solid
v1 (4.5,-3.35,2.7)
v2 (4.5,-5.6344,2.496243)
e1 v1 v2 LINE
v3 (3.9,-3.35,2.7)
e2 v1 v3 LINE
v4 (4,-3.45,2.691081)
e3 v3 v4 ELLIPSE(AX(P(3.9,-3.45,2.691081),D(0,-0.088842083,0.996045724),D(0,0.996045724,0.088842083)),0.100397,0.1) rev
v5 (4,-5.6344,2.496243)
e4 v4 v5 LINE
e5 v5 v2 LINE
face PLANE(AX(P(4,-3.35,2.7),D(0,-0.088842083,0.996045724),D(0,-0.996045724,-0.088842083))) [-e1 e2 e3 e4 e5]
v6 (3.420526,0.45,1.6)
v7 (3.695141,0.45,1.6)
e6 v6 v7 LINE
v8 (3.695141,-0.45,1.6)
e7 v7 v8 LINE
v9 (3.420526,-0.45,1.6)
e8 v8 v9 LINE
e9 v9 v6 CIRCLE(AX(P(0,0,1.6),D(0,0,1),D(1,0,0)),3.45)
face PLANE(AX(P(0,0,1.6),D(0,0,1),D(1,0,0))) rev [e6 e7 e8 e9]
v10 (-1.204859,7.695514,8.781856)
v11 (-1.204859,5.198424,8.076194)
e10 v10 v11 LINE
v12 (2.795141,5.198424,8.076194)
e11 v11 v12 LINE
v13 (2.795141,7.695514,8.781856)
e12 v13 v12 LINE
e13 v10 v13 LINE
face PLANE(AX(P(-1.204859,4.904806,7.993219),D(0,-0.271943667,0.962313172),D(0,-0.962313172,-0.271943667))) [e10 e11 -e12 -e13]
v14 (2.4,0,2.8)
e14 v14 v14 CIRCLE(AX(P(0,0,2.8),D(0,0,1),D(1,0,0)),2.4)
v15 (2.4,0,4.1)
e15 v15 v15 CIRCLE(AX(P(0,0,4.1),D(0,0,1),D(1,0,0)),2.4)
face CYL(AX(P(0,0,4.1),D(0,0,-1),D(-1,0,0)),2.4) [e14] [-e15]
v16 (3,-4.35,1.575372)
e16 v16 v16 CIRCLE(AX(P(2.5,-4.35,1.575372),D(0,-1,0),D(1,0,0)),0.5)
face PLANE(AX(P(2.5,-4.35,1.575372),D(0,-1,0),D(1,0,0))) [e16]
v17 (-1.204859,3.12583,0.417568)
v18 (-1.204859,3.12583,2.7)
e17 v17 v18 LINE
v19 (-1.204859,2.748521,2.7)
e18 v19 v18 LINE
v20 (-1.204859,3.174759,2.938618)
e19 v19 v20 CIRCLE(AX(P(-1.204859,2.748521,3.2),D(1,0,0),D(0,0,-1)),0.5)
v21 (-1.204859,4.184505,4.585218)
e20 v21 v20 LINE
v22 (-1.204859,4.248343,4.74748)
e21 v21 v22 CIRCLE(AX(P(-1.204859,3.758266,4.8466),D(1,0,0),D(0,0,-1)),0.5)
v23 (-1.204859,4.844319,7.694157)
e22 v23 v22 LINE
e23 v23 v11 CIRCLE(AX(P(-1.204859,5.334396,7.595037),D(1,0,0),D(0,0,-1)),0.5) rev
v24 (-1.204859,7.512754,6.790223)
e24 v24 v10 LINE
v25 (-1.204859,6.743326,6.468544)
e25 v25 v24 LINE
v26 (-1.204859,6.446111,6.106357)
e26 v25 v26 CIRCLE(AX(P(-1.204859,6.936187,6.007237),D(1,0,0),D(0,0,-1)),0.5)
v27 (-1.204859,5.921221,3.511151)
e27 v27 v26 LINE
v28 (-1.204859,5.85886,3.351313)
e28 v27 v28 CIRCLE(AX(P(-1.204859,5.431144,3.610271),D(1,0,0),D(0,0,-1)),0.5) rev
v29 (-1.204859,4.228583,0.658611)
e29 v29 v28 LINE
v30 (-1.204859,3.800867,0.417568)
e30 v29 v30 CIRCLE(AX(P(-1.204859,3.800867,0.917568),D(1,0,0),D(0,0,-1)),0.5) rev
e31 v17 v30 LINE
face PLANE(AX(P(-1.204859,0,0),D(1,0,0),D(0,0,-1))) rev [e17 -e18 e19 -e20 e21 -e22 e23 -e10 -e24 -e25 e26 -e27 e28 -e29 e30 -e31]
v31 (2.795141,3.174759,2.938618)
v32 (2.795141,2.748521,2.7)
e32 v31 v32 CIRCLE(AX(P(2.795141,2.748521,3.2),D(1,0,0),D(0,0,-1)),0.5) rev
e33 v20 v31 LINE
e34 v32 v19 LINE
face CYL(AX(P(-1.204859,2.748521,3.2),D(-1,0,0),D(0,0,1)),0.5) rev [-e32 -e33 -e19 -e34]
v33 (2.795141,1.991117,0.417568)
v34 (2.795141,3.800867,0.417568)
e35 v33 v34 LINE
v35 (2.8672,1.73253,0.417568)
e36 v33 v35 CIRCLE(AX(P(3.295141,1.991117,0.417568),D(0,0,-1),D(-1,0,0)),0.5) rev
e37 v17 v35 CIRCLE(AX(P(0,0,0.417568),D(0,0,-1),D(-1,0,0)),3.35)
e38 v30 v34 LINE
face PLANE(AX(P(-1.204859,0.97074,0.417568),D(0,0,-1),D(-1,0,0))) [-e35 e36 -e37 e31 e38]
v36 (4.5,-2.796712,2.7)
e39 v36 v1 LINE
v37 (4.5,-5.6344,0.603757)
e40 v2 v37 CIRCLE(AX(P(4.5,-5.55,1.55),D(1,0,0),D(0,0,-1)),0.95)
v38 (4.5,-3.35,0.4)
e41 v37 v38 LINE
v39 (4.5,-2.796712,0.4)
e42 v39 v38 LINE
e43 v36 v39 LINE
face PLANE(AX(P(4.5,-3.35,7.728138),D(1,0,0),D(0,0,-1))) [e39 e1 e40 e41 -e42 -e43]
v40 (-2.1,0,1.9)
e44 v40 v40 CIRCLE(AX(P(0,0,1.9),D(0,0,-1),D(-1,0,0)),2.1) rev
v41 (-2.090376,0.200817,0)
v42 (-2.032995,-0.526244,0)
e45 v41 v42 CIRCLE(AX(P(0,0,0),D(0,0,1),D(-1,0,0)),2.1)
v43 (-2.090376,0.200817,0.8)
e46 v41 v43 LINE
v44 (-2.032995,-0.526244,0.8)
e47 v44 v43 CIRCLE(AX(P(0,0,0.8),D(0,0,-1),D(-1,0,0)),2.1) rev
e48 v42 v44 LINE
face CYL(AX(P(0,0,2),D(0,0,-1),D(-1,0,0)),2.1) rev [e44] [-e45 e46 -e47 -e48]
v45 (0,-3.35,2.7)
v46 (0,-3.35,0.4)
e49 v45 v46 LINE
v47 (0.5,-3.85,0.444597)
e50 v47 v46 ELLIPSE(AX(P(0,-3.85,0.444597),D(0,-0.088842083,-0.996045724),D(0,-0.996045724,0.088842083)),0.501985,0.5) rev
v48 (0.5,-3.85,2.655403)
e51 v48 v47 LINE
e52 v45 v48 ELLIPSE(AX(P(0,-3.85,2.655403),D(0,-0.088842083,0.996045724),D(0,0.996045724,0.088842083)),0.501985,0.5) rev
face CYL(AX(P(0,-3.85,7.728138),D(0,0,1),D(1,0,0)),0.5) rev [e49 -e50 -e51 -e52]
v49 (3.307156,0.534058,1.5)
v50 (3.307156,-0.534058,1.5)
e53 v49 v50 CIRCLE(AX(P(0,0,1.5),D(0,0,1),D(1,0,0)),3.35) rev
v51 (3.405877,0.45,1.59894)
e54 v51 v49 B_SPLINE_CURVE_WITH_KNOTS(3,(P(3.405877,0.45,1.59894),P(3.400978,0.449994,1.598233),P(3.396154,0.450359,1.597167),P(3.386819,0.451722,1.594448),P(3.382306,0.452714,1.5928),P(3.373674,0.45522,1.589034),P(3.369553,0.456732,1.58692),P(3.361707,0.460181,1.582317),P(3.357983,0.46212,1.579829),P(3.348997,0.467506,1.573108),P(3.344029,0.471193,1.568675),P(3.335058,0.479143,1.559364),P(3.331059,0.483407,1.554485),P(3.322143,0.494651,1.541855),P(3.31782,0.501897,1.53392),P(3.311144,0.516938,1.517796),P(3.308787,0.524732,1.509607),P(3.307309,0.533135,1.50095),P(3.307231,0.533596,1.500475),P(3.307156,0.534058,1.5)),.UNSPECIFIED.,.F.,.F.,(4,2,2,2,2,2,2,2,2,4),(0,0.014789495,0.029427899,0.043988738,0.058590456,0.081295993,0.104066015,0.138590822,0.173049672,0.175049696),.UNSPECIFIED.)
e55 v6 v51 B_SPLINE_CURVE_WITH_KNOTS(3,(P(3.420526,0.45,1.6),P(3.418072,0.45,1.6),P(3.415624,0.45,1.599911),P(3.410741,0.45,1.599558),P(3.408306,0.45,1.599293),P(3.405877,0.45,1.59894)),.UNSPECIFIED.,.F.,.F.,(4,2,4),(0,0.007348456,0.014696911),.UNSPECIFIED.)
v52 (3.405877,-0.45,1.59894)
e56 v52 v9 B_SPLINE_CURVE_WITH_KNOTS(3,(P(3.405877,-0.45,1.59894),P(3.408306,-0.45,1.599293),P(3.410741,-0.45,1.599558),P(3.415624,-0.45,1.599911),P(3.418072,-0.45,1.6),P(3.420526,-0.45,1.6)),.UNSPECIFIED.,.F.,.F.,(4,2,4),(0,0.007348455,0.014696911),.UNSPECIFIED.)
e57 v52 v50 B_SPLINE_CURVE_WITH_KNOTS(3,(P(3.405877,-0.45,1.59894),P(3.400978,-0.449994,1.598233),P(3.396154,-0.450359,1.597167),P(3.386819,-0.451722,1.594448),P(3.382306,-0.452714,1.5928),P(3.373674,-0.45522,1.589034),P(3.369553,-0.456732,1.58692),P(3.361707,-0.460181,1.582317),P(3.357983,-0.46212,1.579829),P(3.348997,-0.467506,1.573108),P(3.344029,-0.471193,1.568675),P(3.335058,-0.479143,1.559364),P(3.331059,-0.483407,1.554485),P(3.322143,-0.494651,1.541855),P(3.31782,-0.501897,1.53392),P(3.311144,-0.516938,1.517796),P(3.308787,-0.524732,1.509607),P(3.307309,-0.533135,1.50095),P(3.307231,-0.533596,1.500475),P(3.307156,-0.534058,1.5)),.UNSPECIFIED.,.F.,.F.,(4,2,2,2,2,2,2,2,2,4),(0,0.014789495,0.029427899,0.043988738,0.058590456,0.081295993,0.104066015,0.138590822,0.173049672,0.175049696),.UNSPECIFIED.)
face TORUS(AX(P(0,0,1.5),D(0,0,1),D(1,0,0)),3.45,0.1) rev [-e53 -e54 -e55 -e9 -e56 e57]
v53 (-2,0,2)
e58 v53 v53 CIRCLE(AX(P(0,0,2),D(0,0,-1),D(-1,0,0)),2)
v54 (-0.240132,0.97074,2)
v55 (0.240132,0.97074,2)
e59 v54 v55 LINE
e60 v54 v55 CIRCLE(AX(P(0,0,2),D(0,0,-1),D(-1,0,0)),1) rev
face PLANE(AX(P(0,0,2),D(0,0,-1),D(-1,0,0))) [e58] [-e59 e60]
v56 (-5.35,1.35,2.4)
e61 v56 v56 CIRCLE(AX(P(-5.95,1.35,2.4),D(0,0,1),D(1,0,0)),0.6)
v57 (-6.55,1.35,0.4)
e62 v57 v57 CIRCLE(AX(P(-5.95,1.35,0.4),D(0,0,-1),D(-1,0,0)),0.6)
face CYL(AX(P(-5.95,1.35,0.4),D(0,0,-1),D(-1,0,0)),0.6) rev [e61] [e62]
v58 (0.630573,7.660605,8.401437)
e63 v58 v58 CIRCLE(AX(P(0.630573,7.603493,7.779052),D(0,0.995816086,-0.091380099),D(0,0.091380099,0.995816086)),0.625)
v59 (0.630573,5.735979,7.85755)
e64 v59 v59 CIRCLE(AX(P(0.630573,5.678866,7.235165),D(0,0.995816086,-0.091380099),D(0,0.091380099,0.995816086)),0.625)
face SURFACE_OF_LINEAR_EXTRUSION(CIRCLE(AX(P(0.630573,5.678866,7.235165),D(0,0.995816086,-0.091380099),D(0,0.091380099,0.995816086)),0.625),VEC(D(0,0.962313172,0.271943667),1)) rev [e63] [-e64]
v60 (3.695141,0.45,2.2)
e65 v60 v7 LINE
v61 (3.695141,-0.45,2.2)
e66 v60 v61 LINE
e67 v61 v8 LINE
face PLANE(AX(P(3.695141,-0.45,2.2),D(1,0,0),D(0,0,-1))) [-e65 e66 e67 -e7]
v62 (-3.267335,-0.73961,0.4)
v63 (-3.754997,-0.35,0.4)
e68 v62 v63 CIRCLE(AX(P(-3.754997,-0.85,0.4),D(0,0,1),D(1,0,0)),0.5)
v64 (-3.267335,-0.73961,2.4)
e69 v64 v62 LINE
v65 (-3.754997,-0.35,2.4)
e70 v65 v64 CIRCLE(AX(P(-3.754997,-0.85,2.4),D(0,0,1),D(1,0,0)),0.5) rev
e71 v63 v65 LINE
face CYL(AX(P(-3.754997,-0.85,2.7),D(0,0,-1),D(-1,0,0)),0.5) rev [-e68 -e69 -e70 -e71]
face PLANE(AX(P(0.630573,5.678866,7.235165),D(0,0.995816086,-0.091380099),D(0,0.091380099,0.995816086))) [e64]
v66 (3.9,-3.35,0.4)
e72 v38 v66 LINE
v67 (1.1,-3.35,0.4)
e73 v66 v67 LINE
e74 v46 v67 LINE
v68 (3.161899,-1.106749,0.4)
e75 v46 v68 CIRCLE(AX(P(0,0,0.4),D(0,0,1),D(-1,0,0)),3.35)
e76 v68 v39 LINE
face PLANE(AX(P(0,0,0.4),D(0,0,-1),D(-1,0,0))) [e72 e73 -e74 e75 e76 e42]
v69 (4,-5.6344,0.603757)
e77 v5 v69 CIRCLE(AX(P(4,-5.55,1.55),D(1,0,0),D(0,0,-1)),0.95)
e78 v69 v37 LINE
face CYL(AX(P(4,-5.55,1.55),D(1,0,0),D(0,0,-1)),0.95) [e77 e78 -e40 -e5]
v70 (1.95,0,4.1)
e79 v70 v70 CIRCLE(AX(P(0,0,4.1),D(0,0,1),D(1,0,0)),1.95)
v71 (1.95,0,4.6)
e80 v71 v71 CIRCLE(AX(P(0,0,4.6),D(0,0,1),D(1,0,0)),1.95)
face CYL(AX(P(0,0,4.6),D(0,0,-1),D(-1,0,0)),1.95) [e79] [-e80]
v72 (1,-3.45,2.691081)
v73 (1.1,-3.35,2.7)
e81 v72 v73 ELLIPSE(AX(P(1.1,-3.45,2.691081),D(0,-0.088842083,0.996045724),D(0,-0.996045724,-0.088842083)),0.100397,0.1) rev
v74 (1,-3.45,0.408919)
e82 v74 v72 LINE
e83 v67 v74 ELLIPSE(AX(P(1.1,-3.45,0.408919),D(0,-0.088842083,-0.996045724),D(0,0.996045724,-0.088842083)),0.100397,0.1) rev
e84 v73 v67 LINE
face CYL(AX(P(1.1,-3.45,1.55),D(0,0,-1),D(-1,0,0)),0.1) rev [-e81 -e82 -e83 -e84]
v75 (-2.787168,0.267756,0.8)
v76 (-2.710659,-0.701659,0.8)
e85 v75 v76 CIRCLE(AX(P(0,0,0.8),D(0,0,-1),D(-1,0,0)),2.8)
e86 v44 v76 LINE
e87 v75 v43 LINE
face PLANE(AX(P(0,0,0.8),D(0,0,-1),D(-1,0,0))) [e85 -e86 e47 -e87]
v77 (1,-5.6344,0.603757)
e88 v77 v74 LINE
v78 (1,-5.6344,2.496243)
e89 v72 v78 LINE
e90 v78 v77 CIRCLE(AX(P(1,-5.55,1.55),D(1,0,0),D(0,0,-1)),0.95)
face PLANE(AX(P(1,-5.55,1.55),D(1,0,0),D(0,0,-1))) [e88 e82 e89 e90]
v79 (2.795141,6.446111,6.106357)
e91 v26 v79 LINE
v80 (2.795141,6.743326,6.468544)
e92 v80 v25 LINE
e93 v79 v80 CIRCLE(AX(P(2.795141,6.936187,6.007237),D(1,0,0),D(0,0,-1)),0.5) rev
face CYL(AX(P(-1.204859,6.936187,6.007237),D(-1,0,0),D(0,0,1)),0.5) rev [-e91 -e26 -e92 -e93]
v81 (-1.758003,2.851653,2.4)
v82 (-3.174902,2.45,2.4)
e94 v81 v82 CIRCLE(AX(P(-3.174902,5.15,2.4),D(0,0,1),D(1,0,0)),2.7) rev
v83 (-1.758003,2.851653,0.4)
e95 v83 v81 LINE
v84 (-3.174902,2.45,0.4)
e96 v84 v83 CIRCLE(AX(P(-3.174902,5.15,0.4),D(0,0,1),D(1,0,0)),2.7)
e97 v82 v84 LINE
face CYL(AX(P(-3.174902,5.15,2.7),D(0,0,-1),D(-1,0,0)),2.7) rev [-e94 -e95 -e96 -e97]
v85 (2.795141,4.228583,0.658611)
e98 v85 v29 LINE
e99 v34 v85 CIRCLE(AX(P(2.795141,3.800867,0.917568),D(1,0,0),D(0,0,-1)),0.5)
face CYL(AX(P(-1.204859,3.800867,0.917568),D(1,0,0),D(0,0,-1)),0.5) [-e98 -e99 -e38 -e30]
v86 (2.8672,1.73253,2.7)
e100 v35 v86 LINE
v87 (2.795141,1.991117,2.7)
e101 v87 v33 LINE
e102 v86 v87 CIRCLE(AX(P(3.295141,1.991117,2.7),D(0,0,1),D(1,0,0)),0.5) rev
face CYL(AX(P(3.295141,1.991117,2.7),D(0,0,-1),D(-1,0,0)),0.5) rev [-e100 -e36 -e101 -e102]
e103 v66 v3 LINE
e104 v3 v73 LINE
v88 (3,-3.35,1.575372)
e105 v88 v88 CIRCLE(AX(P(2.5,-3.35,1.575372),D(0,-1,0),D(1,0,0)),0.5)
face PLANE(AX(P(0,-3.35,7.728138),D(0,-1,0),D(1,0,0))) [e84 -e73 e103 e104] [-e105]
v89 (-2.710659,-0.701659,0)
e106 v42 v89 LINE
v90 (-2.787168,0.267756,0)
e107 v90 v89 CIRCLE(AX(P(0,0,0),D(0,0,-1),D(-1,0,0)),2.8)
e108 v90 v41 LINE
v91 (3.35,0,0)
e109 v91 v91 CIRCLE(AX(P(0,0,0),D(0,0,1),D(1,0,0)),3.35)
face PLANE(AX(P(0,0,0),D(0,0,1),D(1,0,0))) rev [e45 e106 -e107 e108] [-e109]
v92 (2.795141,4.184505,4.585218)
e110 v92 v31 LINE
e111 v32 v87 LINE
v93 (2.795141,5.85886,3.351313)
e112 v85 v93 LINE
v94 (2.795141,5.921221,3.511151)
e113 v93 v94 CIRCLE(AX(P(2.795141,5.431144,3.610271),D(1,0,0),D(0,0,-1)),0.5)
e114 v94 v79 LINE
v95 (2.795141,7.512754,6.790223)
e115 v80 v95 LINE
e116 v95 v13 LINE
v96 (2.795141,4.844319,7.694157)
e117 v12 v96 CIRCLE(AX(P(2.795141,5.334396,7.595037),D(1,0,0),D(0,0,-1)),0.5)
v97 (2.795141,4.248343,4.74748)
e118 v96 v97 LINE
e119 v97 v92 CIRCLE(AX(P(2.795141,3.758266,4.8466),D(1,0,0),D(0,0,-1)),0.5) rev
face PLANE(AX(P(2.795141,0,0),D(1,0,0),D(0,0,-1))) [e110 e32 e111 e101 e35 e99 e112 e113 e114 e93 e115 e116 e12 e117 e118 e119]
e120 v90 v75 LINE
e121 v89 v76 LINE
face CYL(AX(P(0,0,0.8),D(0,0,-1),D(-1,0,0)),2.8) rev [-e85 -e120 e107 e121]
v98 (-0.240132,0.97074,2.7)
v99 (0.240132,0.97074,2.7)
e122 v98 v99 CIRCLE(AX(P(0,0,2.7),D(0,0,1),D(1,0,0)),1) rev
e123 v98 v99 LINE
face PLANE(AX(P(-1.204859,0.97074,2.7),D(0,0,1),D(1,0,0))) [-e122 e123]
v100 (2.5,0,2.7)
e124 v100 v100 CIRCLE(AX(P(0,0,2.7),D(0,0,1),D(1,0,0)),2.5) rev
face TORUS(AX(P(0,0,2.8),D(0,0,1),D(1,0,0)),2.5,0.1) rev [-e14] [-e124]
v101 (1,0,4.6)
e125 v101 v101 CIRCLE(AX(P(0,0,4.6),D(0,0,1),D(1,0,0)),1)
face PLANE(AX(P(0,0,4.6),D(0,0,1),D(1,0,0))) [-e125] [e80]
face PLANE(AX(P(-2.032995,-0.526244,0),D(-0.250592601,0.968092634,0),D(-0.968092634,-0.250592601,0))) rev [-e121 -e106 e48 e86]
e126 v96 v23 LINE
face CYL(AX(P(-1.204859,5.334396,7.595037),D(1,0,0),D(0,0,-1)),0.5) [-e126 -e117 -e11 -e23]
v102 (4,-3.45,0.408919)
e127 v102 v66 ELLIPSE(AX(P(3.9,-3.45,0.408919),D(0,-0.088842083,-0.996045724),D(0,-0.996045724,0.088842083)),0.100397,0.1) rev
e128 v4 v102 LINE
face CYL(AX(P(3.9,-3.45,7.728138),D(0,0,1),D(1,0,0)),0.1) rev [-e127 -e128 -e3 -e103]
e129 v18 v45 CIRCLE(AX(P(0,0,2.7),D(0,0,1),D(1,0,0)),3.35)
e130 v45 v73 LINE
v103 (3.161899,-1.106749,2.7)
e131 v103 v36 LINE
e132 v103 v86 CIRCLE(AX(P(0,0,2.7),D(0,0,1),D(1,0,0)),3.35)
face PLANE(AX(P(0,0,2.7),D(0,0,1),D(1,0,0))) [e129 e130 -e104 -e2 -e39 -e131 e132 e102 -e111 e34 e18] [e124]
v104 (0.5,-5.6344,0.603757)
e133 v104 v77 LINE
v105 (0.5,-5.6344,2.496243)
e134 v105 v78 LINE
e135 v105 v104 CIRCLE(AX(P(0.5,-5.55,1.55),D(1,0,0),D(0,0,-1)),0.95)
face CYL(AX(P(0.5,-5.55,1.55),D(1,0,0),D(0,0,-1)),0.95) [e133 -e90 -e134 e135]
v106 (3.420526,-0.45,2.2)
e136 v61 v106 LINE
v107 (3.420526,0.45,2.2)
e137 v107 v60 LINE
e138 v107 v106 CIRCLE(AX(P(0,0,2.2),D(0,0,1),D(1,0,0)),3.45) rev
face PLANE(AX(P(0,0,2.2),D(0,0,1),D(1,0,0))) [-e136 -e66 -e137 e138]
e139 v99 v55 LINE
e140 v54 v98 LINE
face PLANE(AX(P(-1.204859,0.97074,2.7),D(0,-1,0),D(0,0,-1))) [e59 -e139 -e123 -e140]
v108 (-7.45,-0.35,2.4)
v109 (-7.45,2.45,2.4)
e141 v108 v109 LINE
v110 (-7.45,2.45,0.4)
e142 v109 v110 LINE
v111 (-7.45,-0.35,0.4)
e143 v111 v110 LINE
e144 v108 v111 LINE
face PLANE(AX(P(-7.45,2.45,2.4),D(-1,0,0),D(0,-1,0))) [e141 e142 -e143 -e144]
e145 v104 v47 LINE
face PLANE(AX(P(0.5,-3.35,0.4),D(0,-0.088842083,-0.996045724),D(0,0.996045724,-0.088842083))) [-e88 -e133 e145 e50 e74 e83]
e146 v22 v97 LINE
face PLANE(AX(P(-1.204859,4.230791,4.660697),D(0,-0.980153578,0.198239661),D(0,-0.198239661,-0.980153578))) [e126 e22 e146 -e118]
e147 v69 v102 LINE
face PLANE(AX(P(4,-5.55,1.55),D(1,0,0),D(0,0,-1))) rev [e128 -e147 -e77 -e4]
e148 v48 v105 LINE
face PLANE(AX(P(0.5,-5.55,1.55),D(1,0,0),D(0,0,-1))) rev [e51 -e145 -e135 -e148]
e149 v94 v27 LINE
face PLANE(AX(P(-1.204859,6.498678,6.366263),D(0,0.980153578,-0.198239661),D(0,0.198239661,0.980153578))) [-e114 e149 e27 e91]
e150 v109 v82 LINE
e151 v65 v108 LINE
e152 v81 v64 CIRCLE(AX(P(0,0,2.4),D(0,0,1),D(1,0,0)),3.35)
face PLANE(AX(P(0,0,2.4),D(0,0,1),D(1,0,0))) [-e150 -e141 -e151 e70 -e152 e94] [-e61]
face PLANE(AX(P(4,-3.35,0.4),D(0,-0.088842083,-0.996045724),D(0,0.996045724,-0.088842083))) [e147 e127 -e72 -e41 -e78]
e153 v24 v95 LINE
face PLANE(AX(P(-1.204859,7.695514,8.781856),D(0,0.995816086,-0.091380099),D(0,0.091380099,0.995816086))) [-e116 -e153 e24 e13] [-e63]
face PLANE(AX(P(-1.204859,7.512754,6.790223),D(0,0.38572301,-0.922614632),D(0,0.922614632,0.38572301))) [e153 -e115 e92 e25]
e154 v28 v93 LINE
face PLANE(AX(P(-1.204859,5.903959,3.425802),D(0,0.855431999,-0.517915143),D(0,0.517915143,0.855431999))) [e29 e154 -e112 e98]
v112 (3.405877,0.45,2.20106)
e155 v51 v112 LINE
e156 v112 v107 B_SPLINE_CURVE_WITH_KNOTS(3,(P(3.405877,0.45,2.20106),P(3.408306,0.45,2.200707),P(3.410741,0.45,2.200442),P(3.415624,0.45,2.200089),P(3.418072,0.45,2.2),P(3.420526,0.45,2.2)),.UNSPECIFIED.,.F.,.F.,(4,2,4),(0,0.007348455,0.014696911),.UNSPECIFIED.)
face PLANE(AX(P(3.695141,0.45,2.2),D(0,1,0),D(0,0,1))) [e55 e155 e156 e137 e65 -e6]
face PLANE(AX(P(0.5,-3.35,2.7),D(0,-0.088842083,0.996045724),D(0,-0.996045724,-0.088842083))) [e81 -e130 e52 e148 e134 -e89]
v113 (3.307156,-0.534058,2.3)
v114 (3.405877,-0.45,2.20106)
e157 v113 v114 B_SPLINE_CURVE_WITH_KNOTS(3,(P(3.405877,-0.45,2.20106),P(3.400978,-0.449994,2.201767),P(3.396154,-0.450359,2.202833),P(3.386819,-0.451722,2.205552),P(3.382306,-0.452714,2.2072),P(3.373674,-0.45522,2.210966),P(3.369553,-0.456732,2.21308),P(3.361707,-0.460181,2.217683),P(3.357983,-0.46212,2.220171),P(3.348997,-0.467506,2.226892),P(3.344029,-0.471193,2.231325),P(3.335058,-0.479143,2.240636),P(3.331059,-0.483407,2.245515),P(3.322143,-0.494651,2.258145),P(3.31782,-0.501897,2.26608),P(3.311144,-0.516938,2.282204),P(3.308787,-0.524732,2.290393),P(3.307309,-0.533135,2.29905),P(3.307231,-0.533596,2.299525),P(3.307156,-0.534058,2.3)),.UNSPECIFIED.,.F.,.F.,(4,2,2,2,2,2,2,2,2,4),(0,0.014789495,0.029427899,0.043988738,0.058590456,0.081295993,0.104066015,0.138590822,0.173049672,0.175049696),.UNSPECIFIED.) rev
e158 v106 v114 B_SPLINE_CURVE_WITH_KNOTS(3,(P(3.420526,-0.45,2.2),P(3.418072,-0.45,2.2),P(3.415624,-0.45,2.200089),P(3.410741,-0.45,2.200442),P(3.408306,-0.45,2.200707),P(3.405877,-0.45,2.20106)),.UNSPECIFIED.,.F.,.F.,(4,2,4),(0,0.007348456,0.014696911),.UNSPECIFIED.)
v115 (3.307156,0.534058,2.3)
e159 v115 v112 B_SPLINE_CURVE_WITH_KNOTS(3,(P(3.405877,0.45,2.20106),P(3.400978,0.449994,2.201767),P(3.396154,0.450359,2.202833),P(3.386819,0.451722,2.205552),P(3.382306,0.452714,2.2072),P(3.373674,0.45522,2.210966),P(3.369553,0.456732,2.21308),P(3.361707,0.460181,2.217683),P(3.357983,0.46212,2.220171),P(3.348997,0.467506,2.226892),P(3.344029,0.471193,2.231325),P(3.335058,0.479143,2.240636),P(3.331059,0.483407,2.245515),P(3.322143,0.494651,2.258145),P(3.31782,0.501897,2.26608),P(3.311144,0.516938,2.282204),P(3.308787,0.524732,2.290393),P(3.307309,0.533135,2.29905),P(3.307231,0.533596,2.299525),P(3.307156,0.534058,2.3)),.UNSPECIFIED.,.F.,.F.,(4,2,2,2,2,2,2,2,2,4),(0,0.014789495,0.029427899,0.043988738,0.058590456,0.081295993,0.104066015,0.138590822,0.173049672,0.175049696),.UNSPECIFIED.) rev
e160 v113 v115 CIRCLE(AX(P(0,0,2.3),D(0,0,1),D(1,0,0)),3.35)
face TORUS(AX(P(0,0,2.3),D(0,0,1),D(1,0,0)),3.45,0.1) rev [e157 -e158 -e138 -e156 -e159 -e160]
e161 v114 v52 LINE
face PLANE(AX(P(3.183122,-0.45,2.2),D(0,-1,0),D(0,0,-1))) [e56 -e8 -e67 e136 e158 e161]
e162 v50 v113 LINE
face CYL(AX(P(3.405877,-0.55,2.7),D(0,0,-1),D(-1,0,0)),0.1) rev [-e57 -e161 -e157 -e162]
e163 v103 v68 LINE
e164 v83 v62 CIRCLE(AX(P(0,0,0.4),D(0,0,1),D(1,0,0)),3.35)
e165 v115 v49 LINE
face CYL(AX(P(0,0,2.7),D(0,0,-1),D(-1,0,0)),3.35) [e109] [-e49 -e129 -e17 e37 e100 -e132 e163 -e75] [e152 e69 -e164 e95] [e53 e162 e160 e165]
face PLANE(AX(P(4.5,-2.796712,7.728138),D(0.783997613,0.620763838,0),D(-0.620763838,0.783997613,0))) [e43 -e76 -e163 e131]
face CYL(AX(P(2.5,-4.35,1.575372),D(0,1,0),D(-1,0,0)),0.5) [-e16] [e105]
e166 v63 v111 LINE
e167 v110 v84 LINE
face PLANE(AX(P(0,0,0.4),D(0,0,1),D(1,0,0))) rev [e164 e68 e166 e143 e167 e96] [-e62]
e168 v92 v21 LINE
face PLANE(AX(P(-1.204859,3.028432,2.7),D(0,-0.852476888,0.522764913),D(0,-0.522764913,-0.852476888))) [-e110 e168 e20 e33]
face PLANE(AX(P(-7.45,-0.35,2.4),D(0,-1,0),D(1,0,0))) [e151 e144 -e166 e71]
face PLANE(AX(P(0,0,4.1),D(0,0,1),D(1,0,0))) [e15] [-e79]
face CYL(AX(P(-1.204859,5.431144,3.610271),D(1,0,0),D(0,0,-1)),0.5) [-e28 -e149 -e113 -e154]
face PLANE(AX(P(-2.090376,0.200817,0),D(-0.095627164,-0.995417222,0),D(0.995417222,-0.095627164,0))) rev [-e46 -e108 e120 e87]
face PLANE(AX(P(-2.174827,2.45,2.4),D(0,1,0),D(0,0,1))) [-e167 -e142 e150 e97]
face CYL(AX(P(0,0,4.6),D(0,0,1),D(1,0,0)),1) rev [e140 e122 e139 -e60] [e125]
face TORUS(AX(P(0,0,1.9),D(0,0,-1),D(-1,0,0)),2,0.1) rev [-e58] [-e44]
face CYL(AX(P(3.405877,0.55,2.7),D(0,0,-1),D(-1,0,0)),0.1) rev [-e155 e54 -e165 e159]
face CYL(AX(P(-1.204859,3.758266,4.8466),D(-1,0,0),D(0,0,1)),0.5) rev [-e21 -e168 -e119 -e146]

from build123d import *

# Parameters (mm, degrees)
SKETCH1_R                 = 3.35
BOSS_EXTRUDE1_DEPTH       = 2.7
SKETCH2_R                 = 2.4
BOSS_EXTRUDE2_DEPTH       = 1.4
SKETCH3_R                 = 1.95
BOSS_EXTRUDE3_DEPTH       = 0.5
F_2_0MM_DOWEL_HOLE1_D     = 2
F_2_0MM_DOWEL_HOLE1_DEPTH = 52.32
F_2_0MM_DOWEL_HOLE1_TIP   = 0.600860619
SKETCH7_W                 = 5.275172559
SKETCH7_H                 = 2.8
BOSS_EXTRUDE4_DEPTH       = 2
F_2_0MM_DOWEL_HOLE2_D     = 1.2
F_2_0MM_DOWEL_HOLE2_DEPTH = 52.32
F_2_0MM_DOWEL_HOLE2_TIP   = 0.360516371
BOSS_EXTRUDE5_DEPTH       = 2.3
BOSS_EXTRUDE6_DEPTH       = 0.5
LPATTERN1_COUNT           = 2
LPATTERN1_PITCH           = 3.5
SKETCH12_R                = 0.5
BOSS_EXTRUDE7_DEPTH       = 1
SKETCH13_W                = 0.512018779
SKETCH13_H                = 0.9
BOSS_EXTRUDE8_DEPTH       = 0.6
BOSS_EXTRUDE9_DEPTH       = 4
SKETCH6_R                 = 2.1
CUT_EXTRUDE1_DEPTH        = 2
SKETCH17_R                = 0.625
CUT_EXTRUDE2_DEPTH        = 2
FILLET1_R                 = 0.1
FILLET2_R                 = 2.7
FILLET3_R                 = 0.5
SKETCH18_R                = 2.8
CUT_EXTRUDE3_DEPTH        = 0.8
BOSS_EXTRUDE10_START      = 0.8
BOSS_EXTRUDE10_DEPTH      = 0.8


with BuildPart() as part:
    # Sketch1 → Boss-Extrude1 (new body)
    with BuildSketch(Plane.XY):
        with Locations(Location((0, 0, 0), (0, 0, 180))):
            Circle(SKETCH1_R)
    extrude(amount=BOSS_EXTRUDE1_DEPTH)

    # Sketch2 → Boss-Extrude2 (add)
    with BuildSketch(Plane.XY.offset(2.7)):
        Circle(SKETCH2_R)
    extrude(amount=BOSS_EXTRUDE2_DEPTH)

    # Sketch3 → Boss-Extrude3 (add)
    with BuildSketch(Plane.XY.offset(4.1)):
        Circle(SKETCH3_R)
    extrude(amount=BOSS_EXTRUDE3_DEPTH)

    # Ø2.0mm Dowel Hole1
    with Locations(Plane.XY.offset(4.6)):
        with Locations((0, 0)):
            Hole(F_2_0MM_DOWEL_HOLE1_D / 2, depth=F_2_0MM_DOWEL_HOLE1_DEPTH)
            with Locations((0, 0, -(F_2_0MM_DOWEL_HOLE1_DEPTH + F_2_0MM_DOWEL_HOLE1_TIP / 2))):  # 118° drill point
                Cone(0, F_2_0MM_DOWEL_HOLE1_D / 2, F_2_0MM_DOWEL_HOLE1_TIP, mode=Mode.SUBTRACT)

    # Sketch7 → Boss-Extrude4 (add)
    with BuildSketch(Plane(origin=(0, 0, 0.4), x_dir=(-1, 0, 0), z_dir=(0, 0, -1))):
        with Locations((4.812413721, 1.05)):
            Rectangle(SKETCH7_W, SKETCH7_H)
    extrude(amount=-BOSS_EXTRUDE4_DEPTH)

    # Ø2.0mm Dowel Hole2
    with Locations(Plane(origin=(0, 0, 0.4), x_dir=(-1, 0, 0), z_dir=(0, 0, -1))):
        with Locations((5.95, 1.35)):
            Hole(F_2_0MM_DOWEL_HOLE2_D / 2, depth=F_2_0MM_DOWEL_HOLE2_DEPTH)
            with Locations((0, 0, -(F_2_0MM_DOWEL_HOLE2_DEPTH + F_2_0MM_DOWEL_HOLE2_TIP / 2))):  # 118° drill point
                Cone(0, F_2_0MM_DOWEL_HOLE2_D / 2, F_2_0MM_DOWEL_HOLE2_TIP, mode=Mode.SUBTRACT)

    # Sketch10 → Boss-Extrude5 (add)
    with BuildSketch(Plane(origin=(0, 0, 0.4), x_dir=(-1, 0, 0), z_dir=(0, 0, -1))):
        with BuildLine():
            Line((0, -3.35), (-4.5, -3.35))
            Line((-4.5, -3.35), (-4.5, -2.796712357))
            Line((-4.5, -2.796712357), (-3.161899091, -1.106749357))
            ThreePointArc((-3.161899091, -1.106749357), (-1.938412966, -2.732225315), (0, -3.35))
        make_face()
    extrude(amount=-BOSS_EXTRUDE5_DEPTH)

    # Sketch11 → Boss-Extrude6 (add)
    with BuildSketch(Plane(origin=(4.5, 0, 0), x_dir=(0, 0, -1), z_dir=(1, 0, 0))):
        with BuildLine():
            Line((-2.7, -3.35), (-2.496243438, -5.634399979))
            ThreePointArc((-2.496243438, -5.634399979), (-1.55, -6.5), (-0.603756562, -5.634399979))
            Line((-0.603756562, -5.634399979), (-0.4, -3.35))
            Line((-0.4, -3.35), (-2.7, -3.35))
        make_face()
    boss_extrude6 = extrude(amount=-BOSS_EXTRUDE6_DEPTH)

    # LPattern1: Boss-Extrude6 ×2
    with Locations(*[(-i * LPATTERN1_PITCH, 0, 0) for i in range(1, LPATTERN1_COUNT)]):
        add(boss_extrude6)

    # Sketch12 → Boss-Extrude7 (add)
    with BuildSketch(Plane.XZ.offset(3.35)):
        with Locations((2.5, 1.575371986)):
            Circle(SKETCH12_R)
    extrude(amount=BOSS_EXTRUDE7_DEPTH)

    # Sketch13 → Boss-Extrude8 (add)
    with BuildSketch(Plane(origin=(0, 0, 1.6), x_dir=(-1, 0, 0), z_dir=(0, 0, -1))):
        with Locations((-3.439131456, 0)):
            Rectangle(SKETCH13_W, SKETCH13_H)
    extrude(amount=-BOSS_EXTRUDE8_DEPTH)

    # Sketch14 → Boss-Extrude9 (add)
    with BuildSketch(Plane(origin=(2.795140845, 0, 0), x_dir=(0, 0, -1), z_dir=(1, 0, 0))):
        Polygon((-0.417568245, 0.970740329), (-0.417568245, 4.082645212), (-3.42580183, 5.903958571), (-6.366262564, 6.498677554), (-6.790223471, 7.512753785), (-8.781855644, 7.695513983), (-7.993219009, 4.904805783), (-4.660696843, 4.230790935), (-2.7, 3.028431634), (-2.7, 0.970740329), align=None)
    extrude(amount=-BOSS_EXTRUDE9_DEPTH)

    # Sketch6 → Cut-Extrude1 (cut)
    with BuildSketch(Plane(origin=(0, 0, 0), x_dir=(-1, 0, 0), z_dir=(0, 0, -1))):
        Circle(SKETCH6_R)
    extrude(amount=-CUT_EXTRUDE1_DEPTH, mode=Mode.SUBTRACT)

    # Sketch17 → Cut-Extrude2 (cut, along a direction that is not the sketch's normal)
    with BuildSketch(Plane(origin=(0, 6.832124657, -0.626943304), x_dir=(1, 0, 0), z_dir=(0, 0.9958160861843439, -0.09138009901775918))):
        with Locations((0.630573116, -8.441313195)):
            Circle(SKETCH17_R)
    extrude(amount=-CUT_EXTRUDE2_DEPTH, dir=(0, 0.962313172469087, 0.2719436671306786), mode=Mode.SUBTRACT)

    # Fillet1
    fillet1_edges = [part.edges().sort_by_distance(p)[0] for p in [
        (2.1, 0, 2),
        (-2.4, 0, 2.7),
        (4, -3.35, 1.55),
        (1, -3.35, 1.55),
        (3.35, 0, 1.6),
        (3.319638535, -0.45, 1.9),
        (3.319638535, 0.45, 1.9),
        (3.35, 0, 2.2),
    ]]
    fillet(fillet1_edges, radius=FILLET1_R)

    # Fillet2
    fillet2_edges = [part.edges().sort_by_distance(p)[0] for p in [
        (-2.284731932, 2.45, 1.4),
    ]]
    fillet(fillet2_edges, radius=FILLET2_R)

    # Fillet3
    # the kernel refuses this fillet: 0.5 mm, written as the material it adds along each edge
    with BuildSketch(Plane(origin=(2.795140845, 3.028431634, 2.7), x_dir=(0, 0.522764913438525, 0.8524768884125898), z_dir=(-1, 0, 0))) as fillet3_piece_1:
        with BuildLine():
            CenterArc((FILLET3_R * 0.559821730124, -FILLET3_R), FILLET3_R, 90, 58.482100164)
            Line((-FILLET3_R * 0.292655158289, -FILLET3_R * 0.477235086561), (0, 0))
            Line((0, 0), (FILLET3_R * 0.559821730124, 0))
        make_face()
    extrude(amount=4)
    with BuildSketch(Plane(origin=(2.795140845, 4.230790935, 4.660696843), x_dir=(0, 0.19823966114604022, 0.9801535781441106), z_dir=(-1, 0, 0))) as fillet3_piece_2:
        with BuildLine():
            CenterArc((FILLET3_R * 0.177081663879, -FILLET3_R), FILLET3_R, 90, 20.083861782)
            Line((-FILLET3_R * 0.166313507063, -FILLET3_R * 0.0608089882382), (0, 0))
            Line((0, 0), (FILLET3_R * 0.177081663879, 0))
        make_face()
    extrude(amount=4)
    with BuildSketch(Plane(origin=(2.795140845, 6.498677554, 6.366262564), x_dir=(0, -0.1982396611460371, -0.9801535781441113), z_dir=(-1, 0, 0))) as fillet3_piece_3:
        with BuildLine():
            CenterArc((FILLET3_R * 0.530337057694, -FILLET3_R), FILLET3_R, 90, 55.877328997)
            Line((-FILLET3_R * 0.297501376428, -FILLET3_R * 0.439033399398), (0, 0))
            Line((0, 0), (FILLET3_R * 0.530337057694, 0))
        make_face()
    extrude(amount=4)
    with BuildSketch(Plane(origin=(2.795140845, 1.846533958, 2.7), x_dir=(0.534296962872843, -0.845296844584703, 0), z_dir=(0, 0, -1))) as fillet3_piece_4:
        with BuildLine():
            CenterArc((0.144932912, -0.49989869), FILLET3_R, 91.153417374, 31.142828348)
            Line((-0.122215569, -0.077250268), (0, 0))
            ThreePointArc((0, 0), (0.067434063, -0.000678778), (0.134868127, 0))
        make_face()
    extrude(amount=2.282431755)
    with BuildSketch(Plane(origin=(-3.33166625, -0.35, 2.4), x_dir=(0.16291161628339781, -0.9866406667474896, 0), z_dir=(0, 0, -1))) as fillet3_piece_5:
        with BuildLine():
            CenterArc((0.42435489, 0.499130817), FILLET3_R, 189.375937442, 77.245195509)
            Line((-0.068965443, 0.417675009), (0, 0))
            ThreePointArc((0, 0), (0.1974429, 0.005823524), (0.394885801, 0))
        make_face()
    extrude(amount=2)
    with BuildSketch(Plane(origin=(0.5, -3.35, 0.4), x_dir=(0, -1, 0), z_dir=(0, 0, 1))) as fillet3_piece_6_section:
        with BuildLine():
            CenterArc((FILLET3_R, -FILLET3_R), FILLET3_R, 90, 90)
            Line((0, -FILLET3_R), (0, 0))
            Line((0, 0), (FILLET3_R, 0))
        make_face()
    fillet3_piece_6 = extrude(amount=2.3, mode=Mode.PRIVATE)
    fillet3_piece_6 = split(fillet3_piece_6, bisect_by=Plane(origin=(0.386269446, -3.56317019, 2.680986331), z_dir=(0, 0.08884208299737703, -0.9960457239949817)), keep=Keep.TOP, mode=Mode.PRIVATE)
    fillet3_piece_6 = split(fillet3_piece_6, bisect_by=Plane(origin=(0.386269446, -3.56317019, 0.419013669), z_dir=(0, 0.08884208299737684, 0.9960457239949817)), keep=Keep.TOP, mode=Mode.PRIVATE)
    add(fillet3_piece_6)
    # the kernel refuses this fillet: 0.5 mm, written as the material it takes off along each edge
    with BuildSketch(Plane(origin=(3.499587338, 4.082645212, 0.417568245), x_dir=(0, 0.5179151427951786, 0.8554319989709583), z_dir=(-1, 0, 0))) as fillet3_2_piece_1:
        with BuildLine():
            CenterArc((FILLET3_R * 0.563557194242, -FILLET3_R), FILLET3_R, 90, 58.807492982)
            Line((-FILLET3_R * 0.291874804729, -FILLET3_R * 0.482084857205), (0, 0))
            Line((0, 0), (FILLET3_R * 0.563557194242, 0))
        make_face()
    extrude(amount=5.408892986, mode=Mode.SUBTRACT)
    with BuildSketch(Plane(origin=(3.557934544, 4.904805783, 7.993219009), x_dir=(0, -0.19823966114603667, -0.9801535781441112), z_dir=(-1, 0, 0))) as fillet3_2_piece_2:
        with BuildLine():
            CenterArc((FILLET3_R * 0.610234959151, -FILLET3_R), FILLET3_R, 90, 62.786002784)
            Line((-FILLET3_R * 0.279069719717, -FILLET3_R * 0.542684804382), (0, 0))
            Line((0, 0), (FILLET3_R * 0.610234959151, 0))
        make_face()
    extrude(amount=5.525587398, mode=Mode.SUBTRACT)
    with BuildSketch(Plane(origin=(3.012833965, 5.903958571, 3.42580183), x_dir=(0, 0.19823966114603944, 0.9801535781441109), z_dir=(-1, 0, 0))) as fillet3_2_piece_3:
        with BuildLine():
            CenterArc((FILLET3_R * 0.174154496328, -FILLET3_R), FILLET3_R, 90, 19.758468965)
            Line((-FILLET3_R * 0.163901334448, -FILLET3_R * 0.0588739429395), (0, 0))
            Line((0, 0), (FILLET3_R * 0.174154496328, 0))
        make_face()
    extrude(amount=4.435386241, mode=Mode.SUBTRACT)

    # Sketch18 → Cut-Extrude3 (cut)
    with BuildSketch(Plane(origin=(0, 0, 0), x_dir=(-1, 0, 0), z_dir=(0, 0, -1))):
        Circle(SKETCH18_R)
    extrude(amount=-CUT_EXTRUDE3_DEPTH, mode=Mode.SUBTRACT)

    # Sketch19 → Boss-Extrude10 (add)
    with BuildSketch(Plane(origin=(0, 0, 0.8), x_dir=(-1, 0, 0), z_dir=(0, 0, -1)).offset(BOSS_EXTRUDE10_START)):
        with BuildLine():
            Line((2.090376166, 0.200817044), (2.787168221, 0.267756059))
            ThreePointArc((2.787168221, 0.267756059), (2.791320225, -0.22029844), (2.710659376, -0.701659282))
            Line((2.710659376, -0.701659282), (2.032994532, -0.526244462))
            ThreePointArc((2.032994532, -0.526244462), (2.093490169, -0.16522383), (2.090376166, 0.200817044))
        make_face()
    extrude(amount=-BOSS_EXTRUDE10_DEPTH)


solid = part.part
